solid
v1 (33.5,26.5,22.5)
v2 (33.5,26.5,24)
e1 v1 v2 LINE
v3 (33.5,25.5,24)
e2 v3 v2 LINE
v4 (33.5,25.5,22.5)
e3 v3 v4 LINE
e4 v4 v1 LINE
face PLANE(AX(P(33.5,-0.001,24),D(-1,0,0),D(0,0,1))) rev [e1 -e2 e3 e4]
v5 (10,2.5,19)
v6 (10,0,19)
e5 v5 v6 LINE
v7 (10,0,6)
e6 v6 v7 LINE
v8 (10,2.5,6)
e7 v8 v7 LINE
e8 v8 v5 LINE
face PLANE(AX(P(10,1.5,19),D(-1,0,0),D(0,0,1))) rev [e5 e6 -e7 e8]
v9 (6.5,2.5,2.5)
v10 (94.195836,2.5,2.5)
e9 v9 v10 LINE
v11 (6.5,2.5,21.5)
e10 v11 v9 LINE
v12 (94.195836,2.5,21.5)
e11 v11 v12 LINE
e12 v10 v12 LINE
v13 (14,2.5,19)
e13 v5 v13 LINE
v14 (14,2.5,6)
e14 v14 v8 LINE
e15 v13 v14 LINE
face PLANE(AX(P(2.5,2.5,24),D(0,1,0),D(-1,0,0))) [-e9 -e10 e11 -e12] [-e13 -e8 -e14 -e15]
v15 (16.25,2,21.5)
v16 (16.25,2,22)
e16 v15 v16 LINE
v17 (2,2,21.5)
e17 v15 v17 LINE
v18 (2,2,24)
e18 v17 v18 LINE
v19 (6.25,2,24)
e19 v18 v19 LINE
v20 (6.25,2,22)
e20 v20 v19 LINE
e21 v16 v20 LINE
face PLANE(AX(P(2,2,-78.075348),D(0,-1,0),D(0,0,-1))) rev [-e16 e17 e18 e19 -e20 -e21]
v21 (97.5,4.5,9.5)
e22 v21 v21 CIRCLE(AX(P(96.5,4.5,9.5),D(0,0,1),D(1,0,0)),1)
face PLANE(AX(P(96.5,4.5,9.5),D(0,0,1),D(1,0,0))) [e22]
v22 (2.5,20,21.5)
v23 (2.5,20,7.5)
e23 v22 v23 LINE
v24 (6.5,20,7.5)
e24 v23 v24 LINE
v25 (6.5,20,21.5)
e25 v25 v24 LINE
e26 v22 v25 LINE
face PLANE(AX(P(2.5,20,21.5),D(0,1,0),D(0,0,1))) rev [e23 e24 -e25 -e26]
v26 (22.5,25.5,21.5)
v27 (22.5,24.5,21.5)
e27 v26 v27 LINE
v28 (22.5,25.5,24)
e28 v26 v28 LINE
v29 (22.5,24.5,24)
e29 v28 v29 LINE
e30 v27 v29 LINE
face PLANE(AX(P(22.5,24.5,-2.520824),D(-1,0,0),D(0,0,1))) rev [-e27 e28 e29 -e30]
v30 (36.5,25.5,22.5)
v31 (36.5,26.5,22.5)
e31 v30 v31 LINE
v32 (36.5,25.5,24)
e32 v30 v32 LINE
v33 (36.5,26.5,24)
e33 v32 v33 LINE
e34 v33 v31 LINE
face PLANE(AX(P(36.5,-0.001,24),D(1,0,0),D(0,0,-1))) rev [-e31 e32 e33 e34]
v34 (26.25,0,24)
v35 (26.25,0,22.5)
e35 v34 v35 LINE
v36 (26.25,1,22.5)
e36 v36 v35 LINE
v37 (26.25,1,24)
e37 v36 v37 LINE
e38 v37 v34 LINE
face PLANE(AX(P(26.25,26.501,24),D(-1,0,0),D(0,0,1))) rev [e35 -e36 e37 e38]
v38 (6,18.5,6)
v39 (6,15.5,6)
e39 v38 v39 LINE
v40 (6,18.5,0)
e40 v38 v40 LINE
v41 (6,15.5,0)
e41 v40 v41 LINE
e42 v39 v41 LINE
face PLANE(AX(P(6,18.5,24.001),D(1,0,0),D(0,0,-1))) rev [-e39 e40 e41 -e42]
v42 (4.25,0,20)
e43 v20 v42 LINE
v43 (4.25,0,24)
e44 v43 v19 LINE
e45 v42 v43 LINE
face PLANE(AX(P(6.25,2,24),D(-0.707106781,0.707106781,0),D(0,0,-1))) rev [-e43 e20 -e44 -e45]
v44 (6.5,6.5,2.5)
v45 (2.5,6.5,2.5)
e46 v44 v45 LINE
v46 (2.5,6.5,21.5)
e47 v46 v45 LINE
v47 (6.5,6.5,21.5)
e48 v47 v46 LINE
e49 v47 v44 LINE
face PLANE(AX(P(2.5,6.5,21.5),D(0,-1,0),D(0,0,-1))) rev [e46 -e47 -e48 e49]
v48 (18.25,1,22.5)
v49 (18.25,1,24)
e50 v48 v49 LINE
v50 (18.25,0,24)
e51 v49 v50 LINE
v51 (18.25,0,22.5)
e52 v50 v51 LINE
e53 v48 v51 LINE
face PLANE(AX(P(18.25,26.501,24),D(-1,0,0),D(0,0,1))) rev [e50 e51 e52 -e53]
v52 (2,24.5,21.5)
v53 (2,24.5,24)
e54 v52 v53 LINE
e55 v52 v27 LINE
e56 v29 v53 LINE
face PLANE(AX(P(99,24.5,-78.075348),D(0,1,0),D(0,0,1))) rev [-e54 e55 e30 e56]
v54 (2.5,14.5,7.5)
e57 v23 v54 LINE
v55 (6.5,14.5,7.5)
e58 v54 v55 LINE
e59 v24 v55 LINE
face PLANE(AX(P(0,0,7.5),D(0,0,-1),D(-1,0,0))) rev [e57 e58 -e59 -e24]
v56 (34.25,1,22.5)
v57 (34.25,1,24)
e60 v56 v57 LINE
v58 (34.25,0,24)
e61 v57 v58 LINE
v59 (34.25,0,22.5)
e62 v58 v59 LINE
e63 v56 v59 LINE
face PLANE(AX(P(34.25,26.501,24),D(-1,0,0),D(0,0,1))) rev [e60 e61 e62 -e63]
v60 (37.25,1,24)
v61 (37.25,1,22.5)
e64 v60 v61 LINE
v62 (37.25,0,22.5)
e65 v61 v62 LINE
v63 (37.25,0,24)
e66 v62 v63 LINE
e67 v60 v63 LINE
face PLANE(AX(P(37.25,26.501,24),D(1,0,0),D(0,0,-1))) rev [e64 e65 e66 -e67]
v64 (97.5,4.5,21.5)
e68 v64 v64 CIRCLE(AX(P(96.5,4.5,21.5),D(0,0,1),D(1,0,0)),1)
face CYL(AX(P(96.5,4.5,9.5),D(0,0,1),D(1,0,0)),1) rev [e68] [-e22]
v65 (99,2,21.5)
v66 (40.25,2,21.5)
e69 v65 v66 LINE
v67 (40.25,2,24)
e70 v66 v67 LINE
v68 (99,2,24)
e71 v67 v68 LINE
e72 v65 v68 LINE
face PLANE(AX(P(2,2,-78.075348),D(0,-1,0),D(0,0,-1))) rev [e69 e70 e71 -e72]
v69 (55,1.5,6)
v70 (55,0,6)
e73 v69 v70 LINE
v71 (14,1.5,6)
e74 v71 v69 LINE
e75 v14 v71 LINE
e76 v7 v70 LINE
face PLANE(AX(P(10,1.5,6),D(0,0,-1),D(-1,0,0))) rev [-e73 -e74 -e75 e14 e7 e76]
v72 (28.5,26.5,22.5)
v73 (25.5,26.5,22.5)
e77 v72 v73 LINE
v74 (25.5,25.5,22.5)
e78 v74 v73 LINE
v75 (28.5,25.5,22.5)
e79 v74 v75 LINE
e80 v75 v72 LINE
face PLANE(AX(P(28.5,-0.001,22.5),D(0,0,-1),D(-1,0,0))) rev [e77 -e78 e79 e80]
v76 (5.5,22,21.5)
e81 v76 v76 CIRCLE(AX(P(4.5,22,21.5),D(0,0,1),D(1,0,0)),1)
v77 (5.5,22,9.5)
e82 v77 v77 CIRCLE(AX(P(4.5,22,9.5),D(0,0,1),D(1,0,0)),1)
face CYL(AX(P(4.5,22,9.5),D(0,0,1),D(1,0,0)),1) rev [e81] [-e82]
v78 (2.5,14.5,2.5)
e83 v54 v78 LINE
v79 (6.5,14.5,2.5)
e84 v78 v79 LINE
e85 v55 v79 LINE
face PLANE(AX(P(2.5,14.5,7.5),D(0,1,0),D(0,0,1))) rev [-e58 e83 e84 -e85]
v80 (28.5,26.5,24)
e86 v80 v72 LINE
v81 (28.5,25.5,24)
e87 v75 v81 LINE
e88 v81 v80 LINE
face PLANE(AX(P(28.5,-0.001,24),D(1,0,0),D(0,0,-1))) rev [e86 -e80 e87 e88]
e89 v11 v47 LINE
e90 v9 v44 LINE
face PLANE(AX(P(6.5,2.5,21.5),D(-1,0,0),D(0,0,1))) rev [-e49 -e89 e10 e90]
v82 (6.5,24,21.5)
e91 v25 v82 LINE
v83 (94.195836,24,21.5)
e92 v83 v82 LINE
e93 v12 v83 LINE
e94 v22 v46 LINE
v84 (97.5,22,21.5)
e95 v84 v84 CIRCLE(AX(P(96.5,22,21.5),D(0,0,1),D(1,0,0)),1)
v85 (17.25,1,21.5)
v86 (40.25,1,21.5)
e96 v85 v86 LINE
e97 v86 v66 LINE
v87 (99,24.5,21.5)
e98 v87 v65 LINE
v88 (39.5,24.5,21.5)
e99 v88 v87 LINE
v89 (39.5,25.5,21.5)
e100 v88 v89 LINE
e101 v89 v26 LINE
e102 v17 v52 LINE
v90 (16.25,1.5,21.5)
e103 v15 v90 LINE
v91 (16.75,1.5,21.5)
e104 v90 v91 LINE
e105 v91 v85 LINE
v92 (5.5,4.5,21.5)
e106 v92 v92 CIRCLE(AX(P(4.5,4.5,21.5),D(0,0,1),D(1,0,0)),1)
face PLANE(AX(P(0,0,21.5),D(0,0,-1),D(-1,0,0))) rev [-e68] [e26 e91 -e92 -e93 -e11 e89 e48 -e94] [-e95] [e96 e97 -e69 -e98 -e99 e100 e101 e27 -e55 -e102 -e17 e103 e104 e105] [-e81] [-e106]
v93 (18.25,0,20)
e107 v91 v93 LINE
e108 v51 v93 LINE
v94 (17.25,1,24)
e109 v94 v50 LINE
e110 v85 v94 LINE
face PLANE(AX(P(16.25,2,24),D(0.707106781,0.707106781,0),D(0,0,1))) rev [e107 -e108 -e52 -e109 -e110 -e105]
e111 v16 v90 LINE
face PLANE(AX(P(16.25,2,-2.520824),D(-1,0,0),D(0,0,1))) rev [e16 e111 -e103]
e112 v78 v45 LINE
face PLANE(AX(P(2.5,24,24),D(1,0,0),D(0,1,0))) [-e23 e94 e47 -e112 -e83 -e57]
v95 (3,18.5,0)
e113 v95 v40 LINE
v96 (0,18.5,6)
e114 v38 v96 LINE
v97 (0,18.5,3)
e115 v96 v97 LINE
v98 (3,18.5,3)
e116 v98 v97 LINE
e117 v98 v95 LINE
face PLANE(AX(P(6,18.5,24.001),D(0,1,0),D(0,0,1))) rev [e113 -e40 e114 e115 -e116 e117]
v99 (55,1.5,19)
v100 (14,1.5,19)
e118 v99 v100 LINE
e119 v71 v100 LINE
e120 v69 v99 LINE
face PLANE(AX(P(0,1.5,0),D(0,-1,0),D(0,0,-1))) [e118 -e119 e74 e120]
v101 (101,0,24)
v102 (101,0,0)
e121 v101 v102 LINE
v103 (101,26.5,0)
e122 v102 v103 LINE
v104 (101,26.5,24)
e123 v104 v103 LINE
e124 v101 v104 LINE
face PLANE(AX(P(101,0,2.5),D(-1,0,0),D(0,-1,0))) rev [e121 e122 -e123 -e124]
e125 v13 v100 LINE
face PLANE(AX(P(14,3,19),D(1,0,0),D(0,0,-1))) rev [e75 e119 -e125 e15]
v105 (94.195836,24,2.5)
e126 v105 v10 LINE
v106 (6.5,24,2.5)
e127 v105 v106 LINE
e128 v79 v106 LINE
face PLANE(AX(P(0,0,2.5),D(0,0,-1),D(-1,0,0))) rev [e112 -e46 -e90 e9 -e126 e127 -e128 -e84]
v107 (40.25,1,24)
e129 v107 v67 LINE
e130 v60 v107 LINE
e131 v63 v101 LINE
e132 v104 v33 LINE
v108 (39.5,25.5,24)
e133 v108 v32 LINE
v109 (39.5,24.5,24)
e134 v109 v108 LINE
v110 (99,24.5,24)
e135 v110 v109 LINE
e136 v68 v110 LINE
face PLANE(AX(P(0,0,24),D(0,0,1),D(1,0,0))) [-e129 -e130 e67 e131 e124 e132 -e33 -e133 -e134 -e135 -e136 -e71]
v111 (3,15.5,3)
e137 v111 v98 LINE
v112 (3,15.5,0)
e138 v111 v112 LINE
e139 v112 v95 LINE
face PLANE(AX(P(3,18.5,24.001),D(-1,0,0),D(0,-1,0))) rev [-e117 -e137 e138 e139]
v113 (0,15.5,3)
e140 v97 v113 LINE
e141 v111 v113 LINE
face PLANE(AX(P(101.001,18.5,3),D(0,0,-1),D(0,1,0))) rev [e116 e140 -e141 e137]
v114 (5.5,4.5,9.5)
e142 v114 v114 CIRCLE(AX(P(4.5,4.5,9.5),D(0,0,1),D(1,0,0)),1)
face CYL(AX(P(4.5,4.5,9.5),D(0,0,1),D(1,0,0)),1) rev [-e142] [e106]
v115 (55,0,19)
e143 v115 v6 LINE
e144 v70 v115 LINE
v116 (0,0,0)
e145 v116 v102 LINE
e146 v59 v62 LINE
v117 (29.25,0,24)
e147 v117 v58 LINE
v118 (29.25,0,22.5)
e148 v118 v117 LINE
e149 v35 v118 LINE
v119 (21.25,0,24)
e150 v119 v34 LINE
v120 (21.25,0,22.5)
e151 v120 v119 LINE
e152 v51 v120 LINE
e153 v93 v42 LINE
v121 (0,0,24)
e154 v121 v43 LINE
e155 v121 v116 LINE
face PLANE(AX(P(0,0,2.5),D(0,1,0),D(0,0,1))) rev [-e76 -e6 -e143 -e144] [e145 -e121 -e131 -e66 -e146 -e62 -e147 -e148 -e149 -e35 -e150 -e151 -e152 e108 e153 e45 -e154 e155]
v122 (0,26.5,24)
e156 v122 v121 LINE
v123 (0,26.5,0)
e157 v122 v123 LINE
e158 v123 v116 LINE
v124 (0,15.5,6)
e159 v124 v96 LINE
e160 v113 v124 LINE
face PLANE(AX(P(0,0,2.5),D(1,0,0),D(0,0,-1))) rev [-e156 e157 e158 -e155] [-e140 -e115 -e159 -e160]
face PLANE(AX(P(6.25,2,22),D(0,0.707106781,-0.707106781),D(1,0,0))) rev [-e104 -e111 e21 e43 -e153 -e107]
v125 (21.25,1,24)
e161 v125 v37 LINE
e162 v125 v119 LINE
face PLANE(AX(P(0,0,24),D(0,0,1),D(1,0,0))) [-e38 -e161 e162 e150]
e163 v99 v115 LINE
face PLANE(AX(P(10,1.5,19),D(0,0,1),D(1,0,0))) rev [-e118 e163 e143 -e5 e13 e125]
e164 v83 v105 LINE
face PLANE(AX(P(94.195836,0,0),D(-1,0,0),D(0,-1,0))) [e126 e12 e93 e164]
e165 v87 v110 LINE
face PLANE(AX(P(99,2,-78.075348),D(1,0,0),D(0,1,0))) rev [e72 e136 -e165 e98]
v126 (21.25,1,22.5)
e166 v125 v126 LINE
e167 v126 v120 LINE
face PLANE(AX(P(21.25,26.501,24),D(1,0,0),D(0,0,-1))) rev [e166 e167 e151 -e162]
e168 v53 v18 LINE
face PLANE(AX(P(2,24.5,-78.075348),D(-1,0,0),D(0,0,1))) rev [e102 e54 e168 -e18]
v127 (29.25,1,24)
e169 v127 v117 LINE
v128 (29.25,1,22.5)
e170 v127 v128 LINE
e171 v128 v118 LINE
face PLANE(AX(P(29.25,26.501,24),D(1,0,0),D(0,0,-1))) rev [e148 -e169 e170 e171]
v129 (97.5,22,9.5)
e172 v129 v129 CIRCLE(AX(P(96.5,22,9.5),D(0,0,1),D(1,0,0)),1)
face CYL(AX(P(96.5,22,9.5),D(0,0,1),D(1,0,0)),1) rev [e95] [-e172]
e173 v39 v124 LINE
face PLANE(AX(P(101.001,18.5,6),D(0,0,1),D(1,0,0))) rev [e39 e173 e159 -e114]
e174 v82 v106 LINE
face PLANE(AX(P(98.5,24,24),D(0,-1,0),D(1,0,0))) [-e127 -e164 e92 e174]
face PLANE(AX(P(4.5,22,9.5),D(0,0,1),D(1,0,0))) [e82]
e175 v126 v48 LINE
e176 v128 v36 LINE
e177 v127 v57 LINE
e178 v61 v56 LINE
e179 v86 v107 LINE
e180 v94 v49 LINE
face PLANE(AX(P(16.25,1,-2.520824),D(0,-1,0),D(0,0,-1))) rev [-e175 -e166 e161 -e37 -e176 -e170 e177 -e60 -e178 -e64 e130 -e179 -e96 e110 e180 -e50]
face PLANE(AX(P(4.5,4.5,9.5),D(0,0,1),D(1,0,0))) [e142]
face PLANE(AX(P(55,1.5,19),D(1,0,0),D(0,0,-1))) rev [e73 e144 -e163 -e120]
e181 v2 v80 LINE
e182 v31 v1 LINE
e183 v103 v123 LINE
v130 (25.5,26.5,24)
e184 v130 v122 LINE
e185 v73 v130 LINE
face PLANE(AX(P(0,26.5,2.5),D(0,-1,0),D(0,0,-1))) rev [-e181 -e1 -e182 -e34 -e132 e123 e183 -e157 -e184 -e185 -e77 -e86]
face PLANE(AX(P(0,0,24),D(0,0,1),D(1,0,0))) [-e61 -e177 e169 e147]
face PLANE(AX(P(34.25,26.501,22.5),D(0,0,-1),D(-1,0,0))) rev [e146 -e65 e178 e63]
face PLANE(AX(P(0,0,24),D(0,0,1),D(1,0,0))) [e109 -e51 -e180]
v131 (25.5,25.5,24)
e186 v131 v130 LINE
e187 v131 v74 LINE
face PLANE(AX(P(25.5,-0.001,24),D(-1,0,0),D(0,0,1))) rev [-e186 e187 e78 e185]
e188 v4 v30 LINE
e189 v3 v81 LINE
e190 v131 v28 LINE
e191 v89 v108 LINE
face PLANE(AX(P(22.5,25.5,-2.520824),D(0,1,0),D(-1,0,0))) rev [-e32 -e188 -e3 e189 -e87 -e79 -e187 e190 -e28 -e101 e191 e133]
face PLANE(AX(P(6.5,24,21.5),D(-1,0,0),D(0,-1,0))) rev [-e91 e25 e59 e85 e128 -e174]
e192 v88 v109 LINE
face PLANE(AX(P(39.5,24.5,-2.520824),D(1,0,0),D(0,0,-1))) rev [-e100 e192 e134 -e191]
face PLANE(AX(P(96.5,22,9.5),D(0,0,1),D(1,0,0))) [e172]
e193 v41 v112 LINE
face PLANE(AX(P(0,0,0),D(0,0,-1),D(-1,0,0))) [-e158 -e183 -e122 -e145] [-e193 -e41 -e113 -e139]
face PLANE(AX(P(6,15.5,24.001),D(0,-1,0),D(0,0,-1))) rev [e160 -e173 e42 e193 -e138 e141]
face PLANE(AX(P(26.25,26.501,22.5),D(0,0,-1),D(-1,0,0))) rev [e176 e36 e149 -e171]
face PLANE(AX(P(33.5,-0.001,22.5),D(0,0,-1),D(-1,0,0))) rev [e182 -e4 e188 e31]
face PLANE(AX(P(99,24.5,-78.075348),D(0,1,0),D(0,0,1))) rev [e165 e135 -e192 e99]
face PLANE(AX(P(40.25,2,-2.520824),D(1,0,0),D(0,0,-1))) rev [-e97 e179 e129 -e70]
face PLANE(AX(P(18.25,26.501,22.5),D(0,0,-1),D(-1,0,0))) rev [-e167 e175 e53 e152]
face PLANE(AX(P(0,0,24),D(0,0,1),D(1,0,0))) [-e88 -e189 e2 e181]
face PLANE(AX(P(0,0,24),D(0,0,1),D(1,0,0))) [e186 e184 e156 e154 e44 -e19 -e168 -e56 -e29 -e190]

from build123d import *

# Parameters (mm, degrees)
SKETCH_1_W                = 101
SKETCH_1_H                = 26.5
EXTRUDE_1_DEPTH           = 2.5
SKETCH_2_W                = 101
SKETCH_2_H                = 26.5
SKETCH_2_W_2              = 96
SKETCH_2_H_2              = 21.5
EXTRUDE_2_DEPTH           = 21.5
SKETCH_3_W                = 4
SKETCH_3_H                = 4
EXTRUDE_3_DEPTH           = 19
SKETCH_5_R                = 1
CUT_EXTRUDE_1_DEPTH       = 12
SKETCH_6_W                = 45
SKETCH_6_H                = 13
CUT_EXTRUDE_2_DEPTH       = 1.5
SKETCH_7_W                = 4
SKETCH_7_H                = 13
CUT_EXTRUDE_3_DEPTH       = 1.5
SKETCH_8_W                = 97
SKETCH_8_H                = 22.5
CUT_EXTRUDE_4_DEPTH       = 2.5
CUT_EXTRUDE_5_REACH       = 109.141
SKETCH_9_W                = 10
SKETCH_9_H                = 2
SKETCH_9_W_2              = 3
SKETCH_9_H_2              = 1.5
CHAMFER_1_SIZE            = 2
CUT_EXTRUDE_6_REACH       = 109.141
SKETCH_11_W               = 3
SKETCH_11_H               = 1.5
CUT_EXTRUDE_7_REACH       = 109.141
SKETCH_12_W               = 3
SKETCH_12_H               = 3
SKETCH_14_W               = 4
SKETCH_14_H               = 5.5
SKETCH_14_W_2             = 3
SKETCH_14_H_2             = 3
EXTRUDE_4_DEPTH           = 5
CUT_EXTRUDE_8_REACH       = 109.141
SKETCH_13_W               = 3
SKETCH_13_H               = 3
SKETCH_15_W               = 4
SKETCH_15_H               = 5.5
EXTRUDE_5_DEPTH           = 1.5
SKETCH_16_W               = 19
SKETCH_16_H               = 21.5
EXTRUDE_6_DEPTH           = 1
CUT_EXTRUDE_START         = -2.5
CUT_EXTRUDE_9_OUTLINE_W   = 17
CUT_EXTRUDE_9_OUTLINE_H   = 1
CUT_EXTRUDE_9_OUTLINE_W_2 = 24
CUT_EXTRUDE_9_DEPTH       = 2.5


# Read off the part's stored shape, not the designer's step: 切除-拉伸9
with BuildPart() as part:
    # 草图1 → 凸台-拉伸1 (new body)
    with BuildSketch(Plane.XY):
        with Locations((50.5, 13.25)):
            Rectangle(SKETCH_1_W, SKETCH_1_H)
    extrude(amount=EXTRUDE_1_DEPTH)

    # 草图2 → 凸台-拉伸2 (add)
    with BuildSketch(Plane.XY.offset(2.5)):
        with Locations((50.5, 13.25)):
            Rectangle(SKETCH_2_W, SKETCH_2_H)
        with Locations((50.5, 13.25)):
            Rectangle(SKETCH_2_W_2, SKETCH_2_H_2, mode=Mode.SUBTRACT)
    extrude(amount=EXTRUDE_2_DEPTH)

    # 草图3 → 凸台-拉伸3 (add)
    with BuildSketch(Plane.XY.offset(2.5)):
        with Locations((4.5, 22)):
            Rectangle(SKETCH_3_W, SKETCH_3_H)
        with Locations((4.5, 4.5)):
            Rectangle(SKETCH_3_W, SKETCH_3_H)
        Polygon((98.5, 24), (95.195835911, 24), (95.195835911, 20), (95.195835911, 6.5), (95.195835911, 2.5), (98.5, 2.5), (98.5, 8.754439991), (98.5, 17.745560009), align=None)
    extrude(amount=EXTRUDE_3_DEPTH)

    # 草图5 → 切除-拉伸1 (cut)
    with BuildSketch(Plane.XY.offset(21.5)):
        with Locations((4.5, 22)):
            Circle(SKETCH_5_R)
        with Locations((4.5, 4.5)):
            Circle(SKETCH_5_R)
        with Locations((96.5, 22)):
            Circle(SKETCH_5_R)
        with Locations((96.5, 4.5)):
            Circle(SKETCH_5_R)
    extrude(amount=-CUT_EXTRUDE_1_DEPTH, mode=Mode.SUBTRACT)

    # 草图6 → 切除-拉伸2 (cut)
    with BuildSketch(Plane.XZ):
        with Locations((32.5, 12.5)):
            Rectangle(SKETCH_6_W, SKETCH_6_H)
    extrude(amount=-CUT_EXTRUDE_2_DEPTH, mode=Mode.SUBTRACT)

    # 草图7 → 切除-拉伸3 (cut)
    with BuildSketch(Plane.XZ.offset(-1.5)):
        with Locations((12, 12.5)):
            Rectangle(SKETCH_7_W, SKETCH_7_H)
    extrude(amount=-CUT_EXTRUDE_3_DEPTH, mode=Mode.SUBTRACT)

    # 草图8 → 切除-拉伸4 (cut)
    with BuildSketch(Plane.XY.offset(24)):
        with Locations((50.5, 13.25)):
            Rectangle(SKETCH_8_W, SKETCH_8_H)
    extrude(amount=-CUT_EXTRUDE_4_DEPTH, mode=Mode.SUBTRACT)

    # 草图9 → 切除-拉伸5 (cut, up to next)
    with BuildSketch(Plane.XZ, mode=Mode.PRIVATE) as cut_extrude_5_sk1:
        with Locations((11.25, 23)):
            Rectangle(SKETCH_9_W, SKETCH_9_H)
    cut_extrude_5_tool1 = extrude(cut_extrude_5_sk1.sketch, amount=-CUT_EXTRUDE_5_REACH, mode=Mode.PRIVATE) & part.part
    # 草图9 → 切除-拉伸5 (cut, up to next)
    with BuildSketch(Plane.XZ, mode=Mode.PRIVATE) as cut_extrude_5_sk2:
        with Locations((19.75, 23.25)):
            Rectangle(SKETCH_9_W_2, SKETCH_9_H_2)
    cut_extrude_5_tool2 = extrude(cut_extrude_5_sk2.sketch, amount=-CUT_EXTRUDE_5_REACH, mode=Mode.PRIVATE) & part.part
    # 草图9 → 切除-拉伸5 (cut, up to next)
    with BuildSketch(Plane.XZ, mode=Mode.PRIVATE) as cut_extrude_5_sk3:
        with Locations((27.75, 23.25)):
            Rectangle(SKETCH_9_W_2, SKETCH_9_H_2)
    cut_extrude_5_tool3 = extrude(cut_extrude_5_sk3.sketch, amount=-CUT_EXTRUDE_5_REACH, mode=Mode.PRIVATE) & part.part
    # 草图9 → 切除-拉伸5 (cut, up to next)
    with BuildSketch(Plane.XZ, mode=Mode.PRIVATE) as cut_extrude_5_sk4:
        with Locations((35.75, 23.25)):
            Rectangle(SKETCH_9_W_2, SKETCH_9_H_2)
    cut_extrude_5_tool4 = extrude(cut_extrude_5_sk4.sketch, amount=-CUT_EXTRUDE_5_REACH, mode=Mode.PRIVATE) & part.part
    add(cut_extrude_5_tool1.solids().sort_by_distance((11.25, 0, 23))[0], mode=Mode.SUBTRACT)
    add(cut_extrude_5_tool2.solids().sort_by_distance((19.75, 0, 23.25))[0], mode=Mode.SUBTRACT)
    add(cut_extrude_5_tool3.solids().sort_by_distance((27.75, 0, 23.25))[0], mode=Mode.SUBTRACT)
    add(cut_extrude_5_tool4.solids().sort_by_distance((35.75, 0, 23.25))[0], mode=Mode.SUBTRACT)

    # 倒角1
    chamfer_1_edges = [part.edges().sort_by_distance(p)[0] for p in [
        (16.25, 0, 23),
        (11.25, 0, 22),
        (6.25, 0, 23),
    ]]
    chamfer(chamfer_1_edges, length=CHAMFER_1_SIZE - 0.0001)  # a hair under: the kernel refuses the full size

    # 草图11 → 切除-拉伸6 (cut, up to next)
    with BuildSketch(Plane(origin=(0, 26.5, 0), x_dir=(1, 0, 0), z_dir=(0, 1, 0)), mode=Mode.PRIVATE) as cut_extrude_6_sk1:
        with Locations((27, -23.25)):
            Rectangle(SKETCH_11_W, SKETCH_11_H)
    cut_extrude_6_tool1 = extrude(cut_extrude_6_sk1.sketch, amount=-CUT_EXTRUDE_6_REACH, mode=Mode.PRIVATE) & part.part
    # 草图11 → 切除-拉伸6 (cut, up to next)
    with BuildSketch(Plane(origin=(0, 26.5, 0), x_dir=(1, 0, 0), z_dir=(0, 1, 0)), mode=Mode.PRIVATE) as cut_extrude_6_sk2:
        with Locations((35, -23.25)):
            Rectangle(SKETCH_11_W, SKETCH_11_H)
    cut_extrude_6_tool2 = extrude(cut_extrude_6_sk2.sketch, amount=-CUT_EXTRUDE_6_REACH, mode=Mode.PRIVATE) & part.part
    add(cut_extrude_6_tool1.solids().sort_by_distance((27, 26.5, 23.25))[0], mode=Mode.SUBTRACT)
    add(cut_extrude_6_tool2.solids().sort_by_distance((35, 26.5, 23.25))[0], mode=Mode.SUBTRACT)

    # 草图12 → 切除-拉伸7 (cut, up to next)
    with BuildSketch(Plane(origin=(0, 0, 0), x_dir=(-1, 0, 0), z_dir=(0, 0, -1)), mode=Mode.PRIVATE) as cut_extrude_7_sk1:
        with Locations((-4.5, 17)):
            Rectangle(SKETCH_12_W, SKETCH_12_H)
    cut_extrude_7_tool1 = extrude(cut_extrude_7_sk1.sketch, amount=-CUT_EXTRUDE_7_REACH, mode=Mode.PRIVATE) & part.part
    add(cut_extrude_7_tool1.solids().sort_by_distance((4.5, 17, 0))[0], mode=Mode.SUBTRACT)

    # 草图14 → 凸台-拉伸4 (add)
    with BuildSketch(Plane.XY.offset(2.5)):
        with Locations((4.5, 17.25)):
            Rectangle(SKETCH_14_W, SKETCH_14_H)
        with Locations((4.5, 17)):
            Rectangle(SKETCH_14_W_2, SKETCH_14_H_2, mode=Mode.SUBTRACT)
    extrude(amount=EXTRUDE_4_DEPTH)

    # 草图13 → 切除-拉伸8 (cut, up to next)
    with BuildSketch(Plane.ZY, mode=Mode.PRIVATE) as cut_extrude_8_sk1:
        with Locations((4.5, 17)):
            Rectangle(SKETCH_13_W, SKETCH_13_H)
    cut_extrude_8_tool1 = extrude(cut_extrude_8_sk1.sketch, amount=-CUT_EXTRUDE_8_REACH, mode=Mode.PRIVATE) & part.part
    add(cut_extrude_8_tool1.solids().sort_by_distance((0, 17, 4.5))[0], mode=Mode.SUBTRACT)

    # 草图15 → 凸台-拉伸5 (add)
    with BuildSketch(Plane.XY.offset(7.5)):
        with Locations((4.5, 17.25)):
            Rectangle(SKETCH_15_W, SKETCH_15_H)
    extrude(amount=-EXTRUDE_5_DEPTH)

    # 草图16 → 凸台-拉伸6 (add)
    with BuildSketch(Plane.ZY.offset(-95.195835911)):
        with Locations((12, 13.25)):
            Rectangle(SKETCH_16_W, SKETCH_16_H)
    extrude(amount=EXTRUDE_6_DEPTH)

    # 切除-拉伸9 outline → 切除-拉伸9 (cut)
    with BuildSketch(Plane.XY.offset(24).offset(CUT_EXTRUDE_START)):
        with Locations((31, 25)):
            Rectangle(CUT_EXTRUDE_9_OUTLINE_W, CUT_EXTRUDE_9_OUTLINE_H)
        with Locations((28.25, 1.5)):
            Rectangle(CUT_EXTRUDE_9_OUTLINE_W_2, CUT_EXTRUDE_9_OUTLINE_H)
    extrude(amount=CUT_EXTRUDE_9_DEPTH, mode=Mode.SUBTRACT)


solid = part.part
